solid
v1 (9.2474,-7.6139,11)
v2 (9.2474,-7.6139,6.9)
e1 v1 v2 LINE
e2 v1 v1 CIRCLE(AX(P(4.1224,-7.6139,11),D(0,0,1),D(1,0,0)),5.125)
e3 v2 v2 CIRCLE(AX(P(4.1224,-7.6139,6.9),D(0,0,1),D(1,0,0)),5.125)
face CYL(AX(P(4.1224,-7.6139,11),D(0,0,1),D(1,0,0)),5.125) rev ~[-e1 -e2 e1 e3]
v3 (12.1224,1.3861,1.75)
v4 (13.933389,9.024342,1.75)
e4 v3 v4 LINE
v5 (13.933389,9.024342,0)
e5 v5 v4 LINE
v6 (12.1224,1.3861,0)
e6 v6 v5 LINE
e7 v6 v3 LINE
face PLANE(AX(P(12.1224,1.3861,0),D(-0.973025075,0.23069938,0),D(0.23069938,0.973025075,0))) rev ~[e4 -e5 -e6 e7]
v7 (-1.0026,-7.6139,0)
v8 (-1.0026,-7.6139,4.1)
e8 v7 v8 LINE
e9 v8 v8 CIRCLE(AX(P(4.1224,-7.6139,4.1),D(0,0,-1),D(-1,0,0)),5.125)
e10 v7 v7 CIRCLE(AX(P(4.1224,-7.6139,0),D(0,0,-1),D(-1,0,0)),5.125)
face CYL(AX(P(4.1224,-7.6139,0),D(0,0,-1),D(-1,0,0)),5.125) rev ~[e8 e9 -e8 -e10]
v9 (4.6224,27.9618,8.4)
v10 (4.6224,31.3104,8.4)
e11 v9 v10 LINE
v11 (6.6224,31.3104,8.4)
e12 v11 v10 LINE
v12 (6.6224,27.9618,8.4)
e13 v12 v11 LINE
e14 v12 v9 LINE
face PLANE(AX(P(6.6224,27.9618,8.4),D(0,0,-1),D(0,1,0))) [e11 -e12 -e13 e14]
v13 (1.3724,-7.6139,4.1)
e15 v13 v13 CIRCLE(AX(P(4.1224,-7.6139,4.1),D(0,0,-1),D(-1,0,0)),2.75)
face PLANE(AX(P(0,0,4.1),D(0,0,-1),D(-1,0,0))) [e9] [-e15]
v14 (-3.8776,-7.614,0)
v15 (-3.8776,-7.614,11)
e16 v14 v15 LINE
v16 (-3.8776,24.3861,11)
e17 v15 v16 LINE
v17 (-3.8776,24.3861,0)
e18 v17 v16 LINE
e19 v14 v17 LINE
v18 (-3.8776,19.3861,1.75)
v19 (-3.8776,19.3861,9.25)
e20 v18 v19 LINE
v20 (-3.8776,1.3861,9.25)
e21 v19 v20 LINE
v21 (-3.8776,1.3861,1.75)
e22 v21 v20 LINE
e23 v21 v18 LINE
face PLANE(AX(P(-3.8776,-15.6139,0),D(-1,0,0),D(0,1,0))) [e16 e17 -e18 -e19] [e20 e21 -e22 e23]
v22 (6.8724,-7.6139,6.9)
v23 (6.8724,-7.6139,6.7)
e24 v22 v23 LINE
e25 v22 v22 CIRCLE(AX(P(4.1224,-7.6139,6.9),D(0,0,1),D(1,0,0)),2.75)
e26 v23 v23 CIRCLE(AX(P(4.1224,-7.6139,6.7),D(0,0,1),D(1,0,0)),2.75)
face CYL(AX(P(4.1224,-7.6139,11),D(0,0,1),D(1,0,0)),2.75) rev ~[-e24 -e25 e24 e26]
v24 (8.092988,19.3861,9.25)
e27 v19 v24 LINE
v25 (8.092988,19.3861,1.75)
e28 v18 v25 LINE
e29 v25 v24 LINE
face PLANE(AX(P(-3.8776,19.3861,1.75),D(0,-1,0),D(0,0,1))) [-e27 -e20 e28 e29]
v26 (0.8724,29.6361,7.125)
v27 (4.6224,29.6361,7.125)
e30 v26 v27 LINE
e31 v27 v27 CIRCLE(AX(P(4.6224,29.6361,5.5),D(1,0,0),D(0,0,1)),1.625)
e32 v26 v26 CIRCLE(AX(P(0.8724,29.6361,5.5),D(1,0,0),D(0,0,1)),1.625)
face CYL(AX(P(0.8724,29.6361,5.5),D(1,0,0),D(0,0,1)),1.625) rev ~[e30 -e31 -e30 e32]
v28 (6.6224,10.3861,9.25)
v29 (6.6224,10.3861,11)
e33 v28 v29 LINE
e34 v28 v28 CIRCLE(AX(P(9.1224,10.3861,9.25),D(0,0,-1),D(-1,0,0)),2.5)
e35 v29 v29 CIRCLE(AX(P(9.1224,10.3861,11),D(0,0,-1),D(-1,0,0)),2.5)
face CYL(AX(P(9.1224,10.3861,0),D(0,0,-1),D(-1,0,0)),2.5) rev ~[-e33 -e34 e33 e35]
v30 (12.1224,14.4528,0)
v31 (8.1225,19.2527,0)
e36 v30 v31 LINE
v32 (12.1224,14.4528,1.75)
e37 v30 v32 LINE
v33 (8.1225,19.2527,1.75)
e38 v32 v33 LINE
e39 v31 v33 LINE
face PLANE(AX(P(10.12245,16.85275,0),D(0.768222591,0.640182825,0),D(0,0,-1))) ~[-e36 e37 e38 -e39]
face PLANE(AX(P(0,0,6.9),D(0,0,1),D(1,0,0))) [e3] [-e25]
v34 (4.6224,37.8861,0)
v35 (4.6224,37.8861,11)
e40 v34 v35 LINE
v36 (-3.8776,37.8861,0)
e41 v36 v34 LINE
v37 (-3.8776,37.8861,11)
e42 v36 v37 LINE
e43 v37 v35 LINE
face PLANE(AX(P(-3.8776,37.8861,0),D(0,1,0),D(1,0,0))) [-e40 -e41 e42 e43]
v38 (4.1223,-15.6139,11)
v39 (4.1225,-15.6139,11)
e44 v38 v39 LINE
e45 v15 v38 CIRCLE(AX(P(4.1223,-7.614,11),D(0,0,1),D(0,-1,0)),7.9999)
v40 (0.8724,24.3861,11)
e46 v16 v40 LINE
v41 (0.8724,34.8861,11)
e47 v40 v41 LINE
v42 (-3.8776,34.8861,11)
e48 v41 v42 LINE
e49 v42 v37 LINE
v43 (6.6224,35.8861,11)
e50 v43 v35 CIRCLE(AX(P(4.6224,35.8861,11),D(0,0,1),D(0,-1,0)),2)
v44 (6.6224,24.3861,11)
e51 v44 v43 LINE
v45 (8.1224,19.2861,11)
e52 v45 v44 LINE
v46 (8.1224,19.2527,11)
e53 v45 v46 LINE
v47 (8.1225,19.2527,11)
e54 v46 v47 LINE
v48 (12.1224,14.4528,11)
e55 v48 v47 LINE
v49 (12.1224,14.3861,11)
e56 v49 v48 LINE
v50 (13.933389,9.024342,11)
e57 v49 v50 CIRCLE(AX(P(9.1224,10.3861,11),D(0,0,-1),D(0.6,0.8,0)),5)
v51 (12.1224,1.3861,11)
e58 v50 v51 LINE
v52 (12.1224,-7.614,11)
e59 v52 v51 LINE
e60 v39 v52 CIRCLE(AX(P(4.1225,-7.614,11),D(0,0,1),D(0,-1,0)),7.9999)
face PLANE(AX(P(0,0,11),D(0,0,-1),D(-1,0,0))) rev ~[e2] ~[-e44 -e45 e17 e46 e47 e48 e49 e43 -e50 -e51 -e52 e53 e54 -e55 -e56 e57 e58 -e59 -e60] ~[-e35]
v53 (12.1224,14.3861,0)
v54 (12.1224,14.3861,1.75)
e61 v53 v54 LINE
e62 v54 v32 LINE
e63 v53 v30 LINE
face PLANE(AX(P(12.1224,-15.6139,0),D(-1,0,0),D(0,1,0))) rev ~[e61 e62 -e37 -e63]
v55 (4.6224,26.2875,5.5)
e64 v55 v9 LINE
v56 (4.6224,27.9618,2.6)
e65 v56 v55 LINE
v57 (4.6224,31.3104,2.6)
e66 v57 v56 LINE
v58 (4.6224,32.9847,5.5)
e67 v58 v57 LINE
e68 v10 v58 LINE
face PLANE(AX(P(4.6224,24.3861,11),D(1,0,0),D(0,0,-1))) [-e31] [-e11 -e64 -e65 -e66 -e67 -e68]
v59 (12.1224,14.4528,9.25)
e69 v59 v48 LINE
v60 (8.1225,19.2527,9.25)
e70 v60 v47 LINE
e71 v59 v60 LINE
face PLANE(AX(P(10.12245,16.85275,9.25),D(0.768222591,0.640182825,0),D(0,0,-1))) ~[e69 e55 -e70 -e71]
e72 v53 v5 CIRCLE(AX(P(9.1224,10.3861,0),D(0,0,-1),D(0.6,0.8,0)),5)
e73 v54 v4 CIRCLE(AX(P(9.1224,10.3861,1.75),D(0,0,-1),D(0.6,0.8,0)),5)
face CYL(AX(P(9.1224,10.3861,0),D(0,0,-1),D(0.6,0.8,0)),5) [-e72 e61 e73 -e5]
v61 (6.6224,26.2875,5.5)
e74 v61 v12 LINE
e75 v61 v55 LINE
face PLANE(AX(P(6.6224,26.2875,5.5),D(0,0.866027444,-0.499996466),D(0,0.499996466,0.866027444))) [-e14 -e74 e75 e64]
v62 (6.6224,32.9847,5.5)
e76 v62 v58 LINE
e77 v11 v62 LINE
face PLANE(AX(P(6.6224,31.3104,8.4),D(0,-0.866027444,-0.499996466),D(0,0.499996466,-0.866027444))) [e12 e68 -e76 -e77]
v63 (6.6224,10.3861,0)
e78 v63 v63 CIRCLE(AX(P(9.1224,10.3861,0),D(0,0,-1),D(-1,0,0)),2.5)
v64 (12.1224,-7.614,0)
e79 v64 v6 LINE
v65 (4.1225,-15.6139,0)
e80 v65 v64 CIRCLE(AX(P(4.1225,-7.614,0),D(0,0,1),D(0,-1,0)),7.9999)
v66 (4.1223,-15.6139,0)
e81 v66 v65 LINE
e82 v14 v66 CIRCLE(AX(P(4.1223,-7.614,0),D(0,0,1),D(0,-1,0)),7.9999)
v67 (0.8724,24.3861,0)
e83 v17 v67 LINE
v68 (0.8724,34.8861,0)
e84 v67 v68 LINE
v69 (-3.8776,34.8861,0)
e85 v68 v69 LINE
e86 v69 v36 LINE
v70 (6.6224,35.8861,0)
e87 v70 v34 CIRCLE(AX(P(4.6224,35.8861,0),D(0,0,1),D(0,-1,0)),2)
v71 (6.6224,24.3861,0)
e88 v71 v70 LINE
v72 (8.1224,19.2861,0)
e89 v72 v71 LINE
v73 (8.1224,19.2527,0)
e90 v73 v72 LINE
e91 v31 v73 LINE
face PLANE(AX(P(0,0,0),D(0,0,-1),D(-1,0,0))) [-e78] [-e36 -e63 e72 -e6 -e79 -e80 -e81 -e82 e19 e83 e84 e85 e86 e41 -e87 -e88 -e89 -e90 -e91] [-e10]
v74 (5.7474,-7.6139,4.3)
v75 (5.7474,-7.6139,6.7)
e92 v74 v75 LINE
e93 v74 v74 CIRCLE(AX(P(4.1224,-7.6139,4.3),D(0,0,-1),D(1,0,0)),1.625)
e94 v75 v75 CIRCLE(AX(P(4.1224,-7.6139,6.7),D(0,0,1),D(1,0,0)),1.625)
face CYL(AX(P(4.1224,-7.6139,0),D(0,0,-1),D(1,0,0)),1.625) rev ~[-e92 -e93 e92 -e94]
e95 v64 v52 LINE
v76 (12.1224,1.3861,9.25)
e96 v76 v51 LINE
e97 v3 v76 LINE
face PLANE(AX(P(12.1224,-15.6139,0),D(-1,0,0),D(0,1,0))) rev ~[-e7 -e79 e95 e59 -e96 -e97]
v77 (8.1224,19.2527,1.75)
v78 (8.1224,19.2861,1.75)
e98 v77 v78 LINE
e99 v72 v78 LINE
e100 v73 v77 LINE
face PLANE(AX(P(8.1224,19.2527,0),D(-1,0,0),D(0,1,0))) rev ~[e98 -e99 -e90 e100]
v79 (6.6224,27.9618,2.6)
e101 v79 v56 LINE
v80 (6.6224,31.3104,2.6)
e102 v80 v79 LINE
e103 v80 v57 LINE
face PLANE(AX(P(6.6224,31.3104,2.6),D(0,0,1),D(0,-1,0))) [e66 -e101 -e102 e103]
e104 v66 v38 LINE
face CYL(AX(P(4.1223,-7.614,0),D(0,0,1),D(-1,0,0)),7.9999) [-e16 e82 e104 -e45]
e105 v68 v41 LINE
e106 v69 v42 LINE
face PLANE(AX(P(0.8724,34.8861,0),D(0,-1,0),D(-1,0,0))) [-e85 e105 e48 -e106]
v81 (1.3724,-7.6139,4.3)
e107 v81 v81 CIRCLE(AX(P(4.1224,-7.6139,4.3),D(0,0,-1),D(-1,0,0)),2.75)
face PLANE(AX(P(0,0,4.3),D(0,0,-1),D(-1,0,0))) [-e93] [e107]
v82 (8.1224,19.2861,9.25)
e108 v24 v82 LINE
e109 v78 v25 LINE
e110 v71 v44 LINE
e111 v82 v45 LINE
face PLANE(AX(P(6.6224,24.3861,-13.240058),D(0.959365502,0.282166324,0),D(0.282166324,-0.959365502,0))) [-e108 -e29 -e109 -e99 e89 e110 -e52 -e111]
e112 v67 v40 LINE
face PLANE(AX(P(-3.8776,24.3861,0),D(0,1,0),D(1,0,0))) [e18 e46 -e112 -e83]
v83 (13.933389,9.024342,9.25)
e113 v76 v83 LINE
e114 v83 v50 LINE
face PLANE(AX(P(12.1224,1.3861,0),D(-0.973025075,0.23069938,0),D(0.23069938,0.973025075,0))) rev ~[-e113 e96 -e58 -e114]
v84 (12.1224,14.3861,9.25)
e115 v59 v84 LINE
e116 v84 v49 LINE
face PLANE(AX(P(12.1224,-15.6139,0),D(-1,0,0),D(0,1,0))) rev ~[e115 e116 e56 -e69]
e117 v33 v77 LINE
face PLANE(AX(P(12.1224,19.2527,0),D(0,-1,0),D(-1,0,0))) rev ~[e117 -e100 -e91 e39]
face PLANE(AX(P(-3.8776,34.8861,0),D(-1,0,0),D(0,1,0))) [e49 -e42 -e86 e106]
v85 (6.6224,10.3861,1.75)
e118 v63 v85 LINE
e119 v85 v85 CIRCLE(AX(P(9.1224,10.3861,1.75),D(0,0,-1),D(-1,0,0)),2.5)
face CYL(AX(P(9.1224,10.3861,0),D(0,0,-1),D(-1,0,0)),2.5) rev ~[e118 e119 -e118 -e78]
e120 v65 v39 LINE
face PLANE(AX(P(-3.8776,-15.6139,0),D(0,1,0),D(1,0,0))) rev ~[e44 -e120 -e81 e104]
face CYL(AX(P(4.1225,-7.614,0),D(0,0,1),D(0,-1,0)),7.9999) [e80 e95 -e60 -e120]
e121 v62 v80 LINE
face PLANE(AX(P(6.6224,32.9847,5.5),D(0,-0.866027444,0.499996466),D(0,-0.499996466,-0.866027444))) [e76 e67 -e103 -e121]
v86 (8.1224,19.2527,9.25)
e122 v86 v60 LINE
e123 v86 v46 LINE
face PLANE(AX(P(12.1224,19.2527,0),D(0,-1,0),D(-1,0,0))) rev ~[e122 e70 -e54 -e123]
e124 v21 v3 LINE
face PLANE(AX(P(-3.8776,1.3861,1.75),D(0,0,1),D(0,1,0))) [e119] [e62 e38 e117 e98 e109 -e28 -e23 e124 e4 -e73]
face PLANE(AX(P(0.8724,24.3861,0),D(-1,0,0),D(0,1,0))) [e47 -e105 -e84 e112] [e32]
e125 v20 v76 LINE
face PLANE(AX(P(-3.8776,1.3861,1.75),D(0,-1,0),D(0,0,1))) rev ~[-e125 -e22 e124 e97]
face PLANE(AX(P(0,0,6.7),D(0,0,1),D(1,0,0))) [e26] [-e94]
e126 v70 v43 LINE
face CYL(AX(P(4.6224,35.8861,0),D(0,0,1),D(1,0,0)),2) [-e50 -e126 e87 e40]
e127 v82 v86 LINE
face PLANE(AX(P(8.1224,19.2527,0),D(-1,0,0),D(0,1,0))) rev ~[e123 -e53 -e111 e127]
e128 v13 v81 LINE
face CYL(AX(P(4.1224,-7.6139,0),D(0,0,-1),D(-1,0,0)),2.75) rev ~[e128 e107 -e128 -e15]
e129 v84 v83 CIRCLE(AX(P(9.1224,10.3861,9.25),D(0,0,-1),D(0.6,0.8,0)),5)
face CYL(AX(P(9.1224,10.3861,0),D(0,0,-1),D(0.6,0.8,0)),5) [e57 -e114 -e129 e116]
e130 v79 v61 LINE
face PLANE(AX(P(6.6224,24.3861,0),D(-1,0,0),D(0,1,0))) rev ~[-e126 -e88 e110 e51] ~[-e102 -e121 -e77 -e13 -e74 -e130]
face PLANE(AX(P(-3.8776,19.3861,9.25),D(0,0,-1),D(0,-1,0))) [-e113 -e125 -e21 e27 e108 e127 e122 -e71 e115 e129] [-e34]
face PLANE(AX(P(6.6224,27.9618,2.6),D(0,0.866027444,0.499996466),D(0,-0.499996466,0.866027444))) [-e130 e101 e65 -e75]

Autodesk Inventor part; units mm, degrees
ref_plane "YZ Plane" through (0, 0, 0) normal (1, 0, 0) x (0, 1, 0)
ref_plane "XZ Plane" through (0, 0, 0) normal (0, 1, 0) x (-1, 0, 0)
ref_plane "XY Plane" through (0, 0, 0) normal (0, 0, 1) x (1, 0, 0)
sketch "Szkic1" plane through (0, 0, 0) normal (0, 0, 1) x (1, 0, 0)
  line L0 (-3.8776, -15.6139) -> (12.1224, -15.6139)
  line L1 (12.1224, -15.6139) -> (12.1224, 24.3861)
  line L2 (-3.8776, -15.6139) -> (-3.8776, 24.3861)
  line L3 (-3.8776, 24.3861) -> (12.1224, 24.3861)
  circle A0 centre (4.1224, -7.6139) radius 5.075
  circle A1 centre (4.1224, -7.6139) radius 1.625
  point P0 (0, 0)
  dimension "d0" = 16
  dimension "d1" = 40
  dimension "d2" = 8
  dimension "d3" = 10.15
  dimension "d4" = 8
  dimension "d8" = 3.25
extrude "Wyciągnięcie proste1" add sketch "Szkic1" along normal blind 11 contours L2 L3 L1 L0 | A0
fillet "Zaokrąglenie1" radius 8 2 edges at (-3.8776, -15.6139, 5.5) (12.1224, -15.6139, 5.5)
sketch "Szkic2" plane through (0, 0, 0) normal (0, 0, -1) x (-1, 0, 0)
  arc A0 (-12.1224, -7.6139) -> (3.8776, -7.6139) centre (-4.1224, -7.6139) ccw projected
  line L0 (-4.1224, -15.6139) -> (-13.9839, -15.6139)
  line L1 (3.8776, 24.3861) -> (3.8776, -7.6139) projected
  circle A1 centre (-9.1224, 10.3861) radius 2.5
  arc A2 (-12.1224, 14.3861) -> (-12.1224, 6.3861) centre (-9.1224, 10.3861) ccw
  arc A3 (-12.1224, -7.6139) -> (3.8776, -7.6139) centre (-4.1224, -7.6139) ccw projected
  line L2 (3.8776, 24.3861) -> (3.8776, -7.6139) projected
  line L3 (-12.1224, 24.3861) -> (3.8776, 24.3861) projected
  line L4 (-12.1224, -7.6139) -> (-12.1224, 24.3861) projected
  line L5 (-12.1224, -7.6139) -> (-12.1224, 24.3861) projected
  line L6 (-12.1224, 19.2527) -> (-8.1224, 19.2527)
  line L7 (-8.1224, 19.2527) -> (-8.1224, 24.3861)
  line L8 (-12.1224, 24.3861) -> (3.8776, 24.3861) projected
  point P0 (0, 0)
  dimension "d10" = 26
  dimension "d13" = 5
  dimension "d14" = 10
  dimension "d16" = 4
  dimension "d23" = 13
extrude "Wyciągnięcie proste2" add sketch "Szkic2" against normal blind 11 contours A2 L4
extrude "Wyciągnięcie proste3" cut sketch "Szkic2" against normal blind 11.5 contours L4 L3 L7 L6
extrude "Wyciągnięcie proste4" cut sketch "Szkic2" against normal blind 11.5 contours A1
sketch "Szkic3" plane through (-3.8776, 24.3861, 0) normal (-1, 0, 0) x (0, 0, 1)
  line L0 (11, -32) -> (0, -32) projected
  line L1 (11, 0) -> (11, -32) projected
  line L2 (0, 0) -> (11, 0) projected
  line L3 (0, 0) -> (0, -32) projected
  line L4 (1.75, -23) -> (9.25, -23)
  line L5 (1.75, -23) -> (1.75, -5)
  line L6 (1.75, -5) -> (9.25, -5)
  line L7 (9.25, -5) -> (9.25, -23)
  point P0 (0, -24.3861)
  point P1 (5.75, -14)
  dimension "d24" = 14
  dimension "d26" = 9
  dimension "d27" = 7.5
  dimension "d28" = 11
  dimension "d29" = 18
  dimension "d30" = 1.75
extrude "Wyciągnięcie proste5" cut sketch "Szkic3" against normal blind 20 contours L5 L6 L7 L4
chamfer "Faza3" distance 1.5 distance2 5.1 1 edges at (8.1224, 24.3861, 5.5)
sketch "Szkic5" plane through (0, 0, 0) normal (0, 0, -1) x (-1, 0, 0)
  circle A0 centre (-4.1224, -7.6139) radius 1.625 projected
  circle A1 centre (-4.1224, -7.6139) radius 5.125
  circle A2 centre (-4.1224, -7.6139) radius 2.75
  point P0 (0, 0)
  dimension "d45" = 10.25
  dimension "d64" = 5.5
extrude "Wyciągnięcie proste7" cut sketch "Szkic5" against normal blind 4.1 contours A1 | A2
sketch "Szkic6" plane through (0, 0, 11) normal (0, 0, 1) x (1, 0, 0)
  circle A0 centre (4.1224, -7.6139) radius 5.125 projected
  circle A1 centre (4.1224, -7.6139) radius 1.625 projected
  circle A2 centre (4.1224, -7.6139) radius 2.75
  point P0 (0, 0)
  dimension "d67" = 5.5
extrude "Wyciągnięcie proste8" cut sketch "Szkic6" against normal blind 4.1 contours A0 | A2
sketch "Szkic7" plane through (0, 0, 0) normal (0, 0, -1) x (-1, 0, 0)
  circle A0 centre (-4.1224, -7.6139) radius 5.125 projected
  line L0 (-8.1224, 19.2861) -> (-6.6224, 24.3861) projected
  line L1 (-8.1224, 19.2861) -> (-8.1224, 19.2527) projected
  line L2 (-12.1224, 14.3861) -> (-12.1224, 19.2527) projected
  arc A1 (-12.1224, 14.3861) -> (-12.1224, 6.3861) centre (-9.1224, 10.3861) ccw projected
  arc A2 (-12.1224, -7.6139) -> (3.8776, -7.6139) centre (-4.1224, -7.6139) ccw projected
  line L3 (3.8776, 24.3861) -> (3.8776, -7.6139) projected
  line L4 (-6.6224, 24.3861) -> (3.8776, 24.3861) projected
  circle A3 centre (-9.1224, 10.3861) radius 2.5 projected
  line L5 (-6.6224, 24.3861) -> (-6.6224, 37.8861)
  line L6 (-0.8724, 24.3861) -> (-0.8724, 34.8861)
  line L7 (-0.8724, 34.8861) -> (3.8776, 34.8861)
  line L8 (3.8776, 34.8861) -> (3.8776, 37.8861)
  line L9 (3.8776, 37.8861) -> (-6.6224, 37.8861)
  line L10 (-8.1224, 19.2527) -> (-12.1224, 19.2527) projected
  line L11 (-12.1224, -7.6139) -> (-12.1224, 6.3861) projected
  point P0 (0, 0)
  dimension "d50" = 13.5
  dimension "d52" = 5.75
  dimension "d53" = 10.5
extrude "Wyciągnięcie proste9" add sketch "Szkic7" against normal blind 11 contours L5 L9 L8 L7 L6 L4
fillet "Zaokrąglenie2" radius 2 1 edges at (6.6224, 37.8861, 5.5)
chamfer "Faza4" distance 4.8 distance2 4 1 edges at (12.1224, 19.2527, 0.875) measured on face at (12.1224, 16.0083, 0.5833)
chamfer "Faza5" distance 4.8 distance2 4 1 edges at (12.1224, 19.2527, 10.125) measured on face at (12.1224, 16.0083, 9.8333)
extrude "Wyciągnięcie proste10" cut sketch "Szkic5" against normal blind 4.3 contours A2
extrude "Wyciągnięcie proste11" cut sketch "Szkic6" against normal blind 4.3 contours A2
sketch "Szkic9" plane through (0.8724, 24.3861, 0) normal (-1, 0, 0) x (0, 0, 1)
  line L0 (0, 0) -> (0, 10.5) projected
  line L1 (11, 0) -> (0, 0) projected
  line L2 (11, 10.5) -> (11, 0) projected
  line L3 (0, 10.5) -> (11, 10.5) projected
  point P0 (0, -24.3861)
  point P1 (5.5, 5.25)
  dimension "d73" = 5.5
  dimension "d74" = 11
  dimension "d75" = 5.25
  dimension "d76" = 10.5
hole "Otwór1" at (0.8724, 29.6361, 5.5) direction (1, 0, 0) diameter 3.25 end through all
sketch "Szkic10" plane through (6.6224, 24.3861, 11) normal (1, 0, 0) x (0, 0, -1)
  circle A0 centre (5.5, 5.25) radius 1.625 projected
  line L0 (0, 11.5) -> (11, 11.5) projected
  line L1 (0, 0) -> (0, 11.5) projected
  line L2 (11, 0) -> (0, 0) projected
  line L3 (11, 11.5) -> (11, 0) projected
  line L4 (8.4, 3.5757) -> (5.5, 1.9014)
  line L5 (5.5, 1.9014) -> (2.6, 3.5757)
  line L6 (2.6, 3.5757) -> (2.6, 6.9243)
  line L7 (2.6, 6.9243) -> (5.5, 8.5986)
  line L8 (5.5, 8.5986) -> (8.4, 6.9243)
  line L9 (8.4, 6.9243) -> (8.4, 3.5757)
  point P0 (11, -24.3861)
  point P1 (8.4, 5.25)
extrude "Wyciągnięcie proste13" cut sketch "Szkic10" against normal blind 2 contours L4 L5 L6 L7 L8 L9
chamfer "Faza6" distance 5 distance2 3.2 1 edges at (12.1224, 6.3861, 0.875)
chamfer "Faza7" [suppressed]
equation "\"d2\" = 0.5 * d0"
equation "\"d26\" = d25"
equation "\"d30\" = -0.5 * d27 + 0.5 * d28"
equation "\"d73\" = 0.5 * d74"
equation "\"d75\" = 0.5 * d76"
equation "\"d25\" = 9"
properties part number "3DP_ABS_Extruder_Tensioning_Arm"
